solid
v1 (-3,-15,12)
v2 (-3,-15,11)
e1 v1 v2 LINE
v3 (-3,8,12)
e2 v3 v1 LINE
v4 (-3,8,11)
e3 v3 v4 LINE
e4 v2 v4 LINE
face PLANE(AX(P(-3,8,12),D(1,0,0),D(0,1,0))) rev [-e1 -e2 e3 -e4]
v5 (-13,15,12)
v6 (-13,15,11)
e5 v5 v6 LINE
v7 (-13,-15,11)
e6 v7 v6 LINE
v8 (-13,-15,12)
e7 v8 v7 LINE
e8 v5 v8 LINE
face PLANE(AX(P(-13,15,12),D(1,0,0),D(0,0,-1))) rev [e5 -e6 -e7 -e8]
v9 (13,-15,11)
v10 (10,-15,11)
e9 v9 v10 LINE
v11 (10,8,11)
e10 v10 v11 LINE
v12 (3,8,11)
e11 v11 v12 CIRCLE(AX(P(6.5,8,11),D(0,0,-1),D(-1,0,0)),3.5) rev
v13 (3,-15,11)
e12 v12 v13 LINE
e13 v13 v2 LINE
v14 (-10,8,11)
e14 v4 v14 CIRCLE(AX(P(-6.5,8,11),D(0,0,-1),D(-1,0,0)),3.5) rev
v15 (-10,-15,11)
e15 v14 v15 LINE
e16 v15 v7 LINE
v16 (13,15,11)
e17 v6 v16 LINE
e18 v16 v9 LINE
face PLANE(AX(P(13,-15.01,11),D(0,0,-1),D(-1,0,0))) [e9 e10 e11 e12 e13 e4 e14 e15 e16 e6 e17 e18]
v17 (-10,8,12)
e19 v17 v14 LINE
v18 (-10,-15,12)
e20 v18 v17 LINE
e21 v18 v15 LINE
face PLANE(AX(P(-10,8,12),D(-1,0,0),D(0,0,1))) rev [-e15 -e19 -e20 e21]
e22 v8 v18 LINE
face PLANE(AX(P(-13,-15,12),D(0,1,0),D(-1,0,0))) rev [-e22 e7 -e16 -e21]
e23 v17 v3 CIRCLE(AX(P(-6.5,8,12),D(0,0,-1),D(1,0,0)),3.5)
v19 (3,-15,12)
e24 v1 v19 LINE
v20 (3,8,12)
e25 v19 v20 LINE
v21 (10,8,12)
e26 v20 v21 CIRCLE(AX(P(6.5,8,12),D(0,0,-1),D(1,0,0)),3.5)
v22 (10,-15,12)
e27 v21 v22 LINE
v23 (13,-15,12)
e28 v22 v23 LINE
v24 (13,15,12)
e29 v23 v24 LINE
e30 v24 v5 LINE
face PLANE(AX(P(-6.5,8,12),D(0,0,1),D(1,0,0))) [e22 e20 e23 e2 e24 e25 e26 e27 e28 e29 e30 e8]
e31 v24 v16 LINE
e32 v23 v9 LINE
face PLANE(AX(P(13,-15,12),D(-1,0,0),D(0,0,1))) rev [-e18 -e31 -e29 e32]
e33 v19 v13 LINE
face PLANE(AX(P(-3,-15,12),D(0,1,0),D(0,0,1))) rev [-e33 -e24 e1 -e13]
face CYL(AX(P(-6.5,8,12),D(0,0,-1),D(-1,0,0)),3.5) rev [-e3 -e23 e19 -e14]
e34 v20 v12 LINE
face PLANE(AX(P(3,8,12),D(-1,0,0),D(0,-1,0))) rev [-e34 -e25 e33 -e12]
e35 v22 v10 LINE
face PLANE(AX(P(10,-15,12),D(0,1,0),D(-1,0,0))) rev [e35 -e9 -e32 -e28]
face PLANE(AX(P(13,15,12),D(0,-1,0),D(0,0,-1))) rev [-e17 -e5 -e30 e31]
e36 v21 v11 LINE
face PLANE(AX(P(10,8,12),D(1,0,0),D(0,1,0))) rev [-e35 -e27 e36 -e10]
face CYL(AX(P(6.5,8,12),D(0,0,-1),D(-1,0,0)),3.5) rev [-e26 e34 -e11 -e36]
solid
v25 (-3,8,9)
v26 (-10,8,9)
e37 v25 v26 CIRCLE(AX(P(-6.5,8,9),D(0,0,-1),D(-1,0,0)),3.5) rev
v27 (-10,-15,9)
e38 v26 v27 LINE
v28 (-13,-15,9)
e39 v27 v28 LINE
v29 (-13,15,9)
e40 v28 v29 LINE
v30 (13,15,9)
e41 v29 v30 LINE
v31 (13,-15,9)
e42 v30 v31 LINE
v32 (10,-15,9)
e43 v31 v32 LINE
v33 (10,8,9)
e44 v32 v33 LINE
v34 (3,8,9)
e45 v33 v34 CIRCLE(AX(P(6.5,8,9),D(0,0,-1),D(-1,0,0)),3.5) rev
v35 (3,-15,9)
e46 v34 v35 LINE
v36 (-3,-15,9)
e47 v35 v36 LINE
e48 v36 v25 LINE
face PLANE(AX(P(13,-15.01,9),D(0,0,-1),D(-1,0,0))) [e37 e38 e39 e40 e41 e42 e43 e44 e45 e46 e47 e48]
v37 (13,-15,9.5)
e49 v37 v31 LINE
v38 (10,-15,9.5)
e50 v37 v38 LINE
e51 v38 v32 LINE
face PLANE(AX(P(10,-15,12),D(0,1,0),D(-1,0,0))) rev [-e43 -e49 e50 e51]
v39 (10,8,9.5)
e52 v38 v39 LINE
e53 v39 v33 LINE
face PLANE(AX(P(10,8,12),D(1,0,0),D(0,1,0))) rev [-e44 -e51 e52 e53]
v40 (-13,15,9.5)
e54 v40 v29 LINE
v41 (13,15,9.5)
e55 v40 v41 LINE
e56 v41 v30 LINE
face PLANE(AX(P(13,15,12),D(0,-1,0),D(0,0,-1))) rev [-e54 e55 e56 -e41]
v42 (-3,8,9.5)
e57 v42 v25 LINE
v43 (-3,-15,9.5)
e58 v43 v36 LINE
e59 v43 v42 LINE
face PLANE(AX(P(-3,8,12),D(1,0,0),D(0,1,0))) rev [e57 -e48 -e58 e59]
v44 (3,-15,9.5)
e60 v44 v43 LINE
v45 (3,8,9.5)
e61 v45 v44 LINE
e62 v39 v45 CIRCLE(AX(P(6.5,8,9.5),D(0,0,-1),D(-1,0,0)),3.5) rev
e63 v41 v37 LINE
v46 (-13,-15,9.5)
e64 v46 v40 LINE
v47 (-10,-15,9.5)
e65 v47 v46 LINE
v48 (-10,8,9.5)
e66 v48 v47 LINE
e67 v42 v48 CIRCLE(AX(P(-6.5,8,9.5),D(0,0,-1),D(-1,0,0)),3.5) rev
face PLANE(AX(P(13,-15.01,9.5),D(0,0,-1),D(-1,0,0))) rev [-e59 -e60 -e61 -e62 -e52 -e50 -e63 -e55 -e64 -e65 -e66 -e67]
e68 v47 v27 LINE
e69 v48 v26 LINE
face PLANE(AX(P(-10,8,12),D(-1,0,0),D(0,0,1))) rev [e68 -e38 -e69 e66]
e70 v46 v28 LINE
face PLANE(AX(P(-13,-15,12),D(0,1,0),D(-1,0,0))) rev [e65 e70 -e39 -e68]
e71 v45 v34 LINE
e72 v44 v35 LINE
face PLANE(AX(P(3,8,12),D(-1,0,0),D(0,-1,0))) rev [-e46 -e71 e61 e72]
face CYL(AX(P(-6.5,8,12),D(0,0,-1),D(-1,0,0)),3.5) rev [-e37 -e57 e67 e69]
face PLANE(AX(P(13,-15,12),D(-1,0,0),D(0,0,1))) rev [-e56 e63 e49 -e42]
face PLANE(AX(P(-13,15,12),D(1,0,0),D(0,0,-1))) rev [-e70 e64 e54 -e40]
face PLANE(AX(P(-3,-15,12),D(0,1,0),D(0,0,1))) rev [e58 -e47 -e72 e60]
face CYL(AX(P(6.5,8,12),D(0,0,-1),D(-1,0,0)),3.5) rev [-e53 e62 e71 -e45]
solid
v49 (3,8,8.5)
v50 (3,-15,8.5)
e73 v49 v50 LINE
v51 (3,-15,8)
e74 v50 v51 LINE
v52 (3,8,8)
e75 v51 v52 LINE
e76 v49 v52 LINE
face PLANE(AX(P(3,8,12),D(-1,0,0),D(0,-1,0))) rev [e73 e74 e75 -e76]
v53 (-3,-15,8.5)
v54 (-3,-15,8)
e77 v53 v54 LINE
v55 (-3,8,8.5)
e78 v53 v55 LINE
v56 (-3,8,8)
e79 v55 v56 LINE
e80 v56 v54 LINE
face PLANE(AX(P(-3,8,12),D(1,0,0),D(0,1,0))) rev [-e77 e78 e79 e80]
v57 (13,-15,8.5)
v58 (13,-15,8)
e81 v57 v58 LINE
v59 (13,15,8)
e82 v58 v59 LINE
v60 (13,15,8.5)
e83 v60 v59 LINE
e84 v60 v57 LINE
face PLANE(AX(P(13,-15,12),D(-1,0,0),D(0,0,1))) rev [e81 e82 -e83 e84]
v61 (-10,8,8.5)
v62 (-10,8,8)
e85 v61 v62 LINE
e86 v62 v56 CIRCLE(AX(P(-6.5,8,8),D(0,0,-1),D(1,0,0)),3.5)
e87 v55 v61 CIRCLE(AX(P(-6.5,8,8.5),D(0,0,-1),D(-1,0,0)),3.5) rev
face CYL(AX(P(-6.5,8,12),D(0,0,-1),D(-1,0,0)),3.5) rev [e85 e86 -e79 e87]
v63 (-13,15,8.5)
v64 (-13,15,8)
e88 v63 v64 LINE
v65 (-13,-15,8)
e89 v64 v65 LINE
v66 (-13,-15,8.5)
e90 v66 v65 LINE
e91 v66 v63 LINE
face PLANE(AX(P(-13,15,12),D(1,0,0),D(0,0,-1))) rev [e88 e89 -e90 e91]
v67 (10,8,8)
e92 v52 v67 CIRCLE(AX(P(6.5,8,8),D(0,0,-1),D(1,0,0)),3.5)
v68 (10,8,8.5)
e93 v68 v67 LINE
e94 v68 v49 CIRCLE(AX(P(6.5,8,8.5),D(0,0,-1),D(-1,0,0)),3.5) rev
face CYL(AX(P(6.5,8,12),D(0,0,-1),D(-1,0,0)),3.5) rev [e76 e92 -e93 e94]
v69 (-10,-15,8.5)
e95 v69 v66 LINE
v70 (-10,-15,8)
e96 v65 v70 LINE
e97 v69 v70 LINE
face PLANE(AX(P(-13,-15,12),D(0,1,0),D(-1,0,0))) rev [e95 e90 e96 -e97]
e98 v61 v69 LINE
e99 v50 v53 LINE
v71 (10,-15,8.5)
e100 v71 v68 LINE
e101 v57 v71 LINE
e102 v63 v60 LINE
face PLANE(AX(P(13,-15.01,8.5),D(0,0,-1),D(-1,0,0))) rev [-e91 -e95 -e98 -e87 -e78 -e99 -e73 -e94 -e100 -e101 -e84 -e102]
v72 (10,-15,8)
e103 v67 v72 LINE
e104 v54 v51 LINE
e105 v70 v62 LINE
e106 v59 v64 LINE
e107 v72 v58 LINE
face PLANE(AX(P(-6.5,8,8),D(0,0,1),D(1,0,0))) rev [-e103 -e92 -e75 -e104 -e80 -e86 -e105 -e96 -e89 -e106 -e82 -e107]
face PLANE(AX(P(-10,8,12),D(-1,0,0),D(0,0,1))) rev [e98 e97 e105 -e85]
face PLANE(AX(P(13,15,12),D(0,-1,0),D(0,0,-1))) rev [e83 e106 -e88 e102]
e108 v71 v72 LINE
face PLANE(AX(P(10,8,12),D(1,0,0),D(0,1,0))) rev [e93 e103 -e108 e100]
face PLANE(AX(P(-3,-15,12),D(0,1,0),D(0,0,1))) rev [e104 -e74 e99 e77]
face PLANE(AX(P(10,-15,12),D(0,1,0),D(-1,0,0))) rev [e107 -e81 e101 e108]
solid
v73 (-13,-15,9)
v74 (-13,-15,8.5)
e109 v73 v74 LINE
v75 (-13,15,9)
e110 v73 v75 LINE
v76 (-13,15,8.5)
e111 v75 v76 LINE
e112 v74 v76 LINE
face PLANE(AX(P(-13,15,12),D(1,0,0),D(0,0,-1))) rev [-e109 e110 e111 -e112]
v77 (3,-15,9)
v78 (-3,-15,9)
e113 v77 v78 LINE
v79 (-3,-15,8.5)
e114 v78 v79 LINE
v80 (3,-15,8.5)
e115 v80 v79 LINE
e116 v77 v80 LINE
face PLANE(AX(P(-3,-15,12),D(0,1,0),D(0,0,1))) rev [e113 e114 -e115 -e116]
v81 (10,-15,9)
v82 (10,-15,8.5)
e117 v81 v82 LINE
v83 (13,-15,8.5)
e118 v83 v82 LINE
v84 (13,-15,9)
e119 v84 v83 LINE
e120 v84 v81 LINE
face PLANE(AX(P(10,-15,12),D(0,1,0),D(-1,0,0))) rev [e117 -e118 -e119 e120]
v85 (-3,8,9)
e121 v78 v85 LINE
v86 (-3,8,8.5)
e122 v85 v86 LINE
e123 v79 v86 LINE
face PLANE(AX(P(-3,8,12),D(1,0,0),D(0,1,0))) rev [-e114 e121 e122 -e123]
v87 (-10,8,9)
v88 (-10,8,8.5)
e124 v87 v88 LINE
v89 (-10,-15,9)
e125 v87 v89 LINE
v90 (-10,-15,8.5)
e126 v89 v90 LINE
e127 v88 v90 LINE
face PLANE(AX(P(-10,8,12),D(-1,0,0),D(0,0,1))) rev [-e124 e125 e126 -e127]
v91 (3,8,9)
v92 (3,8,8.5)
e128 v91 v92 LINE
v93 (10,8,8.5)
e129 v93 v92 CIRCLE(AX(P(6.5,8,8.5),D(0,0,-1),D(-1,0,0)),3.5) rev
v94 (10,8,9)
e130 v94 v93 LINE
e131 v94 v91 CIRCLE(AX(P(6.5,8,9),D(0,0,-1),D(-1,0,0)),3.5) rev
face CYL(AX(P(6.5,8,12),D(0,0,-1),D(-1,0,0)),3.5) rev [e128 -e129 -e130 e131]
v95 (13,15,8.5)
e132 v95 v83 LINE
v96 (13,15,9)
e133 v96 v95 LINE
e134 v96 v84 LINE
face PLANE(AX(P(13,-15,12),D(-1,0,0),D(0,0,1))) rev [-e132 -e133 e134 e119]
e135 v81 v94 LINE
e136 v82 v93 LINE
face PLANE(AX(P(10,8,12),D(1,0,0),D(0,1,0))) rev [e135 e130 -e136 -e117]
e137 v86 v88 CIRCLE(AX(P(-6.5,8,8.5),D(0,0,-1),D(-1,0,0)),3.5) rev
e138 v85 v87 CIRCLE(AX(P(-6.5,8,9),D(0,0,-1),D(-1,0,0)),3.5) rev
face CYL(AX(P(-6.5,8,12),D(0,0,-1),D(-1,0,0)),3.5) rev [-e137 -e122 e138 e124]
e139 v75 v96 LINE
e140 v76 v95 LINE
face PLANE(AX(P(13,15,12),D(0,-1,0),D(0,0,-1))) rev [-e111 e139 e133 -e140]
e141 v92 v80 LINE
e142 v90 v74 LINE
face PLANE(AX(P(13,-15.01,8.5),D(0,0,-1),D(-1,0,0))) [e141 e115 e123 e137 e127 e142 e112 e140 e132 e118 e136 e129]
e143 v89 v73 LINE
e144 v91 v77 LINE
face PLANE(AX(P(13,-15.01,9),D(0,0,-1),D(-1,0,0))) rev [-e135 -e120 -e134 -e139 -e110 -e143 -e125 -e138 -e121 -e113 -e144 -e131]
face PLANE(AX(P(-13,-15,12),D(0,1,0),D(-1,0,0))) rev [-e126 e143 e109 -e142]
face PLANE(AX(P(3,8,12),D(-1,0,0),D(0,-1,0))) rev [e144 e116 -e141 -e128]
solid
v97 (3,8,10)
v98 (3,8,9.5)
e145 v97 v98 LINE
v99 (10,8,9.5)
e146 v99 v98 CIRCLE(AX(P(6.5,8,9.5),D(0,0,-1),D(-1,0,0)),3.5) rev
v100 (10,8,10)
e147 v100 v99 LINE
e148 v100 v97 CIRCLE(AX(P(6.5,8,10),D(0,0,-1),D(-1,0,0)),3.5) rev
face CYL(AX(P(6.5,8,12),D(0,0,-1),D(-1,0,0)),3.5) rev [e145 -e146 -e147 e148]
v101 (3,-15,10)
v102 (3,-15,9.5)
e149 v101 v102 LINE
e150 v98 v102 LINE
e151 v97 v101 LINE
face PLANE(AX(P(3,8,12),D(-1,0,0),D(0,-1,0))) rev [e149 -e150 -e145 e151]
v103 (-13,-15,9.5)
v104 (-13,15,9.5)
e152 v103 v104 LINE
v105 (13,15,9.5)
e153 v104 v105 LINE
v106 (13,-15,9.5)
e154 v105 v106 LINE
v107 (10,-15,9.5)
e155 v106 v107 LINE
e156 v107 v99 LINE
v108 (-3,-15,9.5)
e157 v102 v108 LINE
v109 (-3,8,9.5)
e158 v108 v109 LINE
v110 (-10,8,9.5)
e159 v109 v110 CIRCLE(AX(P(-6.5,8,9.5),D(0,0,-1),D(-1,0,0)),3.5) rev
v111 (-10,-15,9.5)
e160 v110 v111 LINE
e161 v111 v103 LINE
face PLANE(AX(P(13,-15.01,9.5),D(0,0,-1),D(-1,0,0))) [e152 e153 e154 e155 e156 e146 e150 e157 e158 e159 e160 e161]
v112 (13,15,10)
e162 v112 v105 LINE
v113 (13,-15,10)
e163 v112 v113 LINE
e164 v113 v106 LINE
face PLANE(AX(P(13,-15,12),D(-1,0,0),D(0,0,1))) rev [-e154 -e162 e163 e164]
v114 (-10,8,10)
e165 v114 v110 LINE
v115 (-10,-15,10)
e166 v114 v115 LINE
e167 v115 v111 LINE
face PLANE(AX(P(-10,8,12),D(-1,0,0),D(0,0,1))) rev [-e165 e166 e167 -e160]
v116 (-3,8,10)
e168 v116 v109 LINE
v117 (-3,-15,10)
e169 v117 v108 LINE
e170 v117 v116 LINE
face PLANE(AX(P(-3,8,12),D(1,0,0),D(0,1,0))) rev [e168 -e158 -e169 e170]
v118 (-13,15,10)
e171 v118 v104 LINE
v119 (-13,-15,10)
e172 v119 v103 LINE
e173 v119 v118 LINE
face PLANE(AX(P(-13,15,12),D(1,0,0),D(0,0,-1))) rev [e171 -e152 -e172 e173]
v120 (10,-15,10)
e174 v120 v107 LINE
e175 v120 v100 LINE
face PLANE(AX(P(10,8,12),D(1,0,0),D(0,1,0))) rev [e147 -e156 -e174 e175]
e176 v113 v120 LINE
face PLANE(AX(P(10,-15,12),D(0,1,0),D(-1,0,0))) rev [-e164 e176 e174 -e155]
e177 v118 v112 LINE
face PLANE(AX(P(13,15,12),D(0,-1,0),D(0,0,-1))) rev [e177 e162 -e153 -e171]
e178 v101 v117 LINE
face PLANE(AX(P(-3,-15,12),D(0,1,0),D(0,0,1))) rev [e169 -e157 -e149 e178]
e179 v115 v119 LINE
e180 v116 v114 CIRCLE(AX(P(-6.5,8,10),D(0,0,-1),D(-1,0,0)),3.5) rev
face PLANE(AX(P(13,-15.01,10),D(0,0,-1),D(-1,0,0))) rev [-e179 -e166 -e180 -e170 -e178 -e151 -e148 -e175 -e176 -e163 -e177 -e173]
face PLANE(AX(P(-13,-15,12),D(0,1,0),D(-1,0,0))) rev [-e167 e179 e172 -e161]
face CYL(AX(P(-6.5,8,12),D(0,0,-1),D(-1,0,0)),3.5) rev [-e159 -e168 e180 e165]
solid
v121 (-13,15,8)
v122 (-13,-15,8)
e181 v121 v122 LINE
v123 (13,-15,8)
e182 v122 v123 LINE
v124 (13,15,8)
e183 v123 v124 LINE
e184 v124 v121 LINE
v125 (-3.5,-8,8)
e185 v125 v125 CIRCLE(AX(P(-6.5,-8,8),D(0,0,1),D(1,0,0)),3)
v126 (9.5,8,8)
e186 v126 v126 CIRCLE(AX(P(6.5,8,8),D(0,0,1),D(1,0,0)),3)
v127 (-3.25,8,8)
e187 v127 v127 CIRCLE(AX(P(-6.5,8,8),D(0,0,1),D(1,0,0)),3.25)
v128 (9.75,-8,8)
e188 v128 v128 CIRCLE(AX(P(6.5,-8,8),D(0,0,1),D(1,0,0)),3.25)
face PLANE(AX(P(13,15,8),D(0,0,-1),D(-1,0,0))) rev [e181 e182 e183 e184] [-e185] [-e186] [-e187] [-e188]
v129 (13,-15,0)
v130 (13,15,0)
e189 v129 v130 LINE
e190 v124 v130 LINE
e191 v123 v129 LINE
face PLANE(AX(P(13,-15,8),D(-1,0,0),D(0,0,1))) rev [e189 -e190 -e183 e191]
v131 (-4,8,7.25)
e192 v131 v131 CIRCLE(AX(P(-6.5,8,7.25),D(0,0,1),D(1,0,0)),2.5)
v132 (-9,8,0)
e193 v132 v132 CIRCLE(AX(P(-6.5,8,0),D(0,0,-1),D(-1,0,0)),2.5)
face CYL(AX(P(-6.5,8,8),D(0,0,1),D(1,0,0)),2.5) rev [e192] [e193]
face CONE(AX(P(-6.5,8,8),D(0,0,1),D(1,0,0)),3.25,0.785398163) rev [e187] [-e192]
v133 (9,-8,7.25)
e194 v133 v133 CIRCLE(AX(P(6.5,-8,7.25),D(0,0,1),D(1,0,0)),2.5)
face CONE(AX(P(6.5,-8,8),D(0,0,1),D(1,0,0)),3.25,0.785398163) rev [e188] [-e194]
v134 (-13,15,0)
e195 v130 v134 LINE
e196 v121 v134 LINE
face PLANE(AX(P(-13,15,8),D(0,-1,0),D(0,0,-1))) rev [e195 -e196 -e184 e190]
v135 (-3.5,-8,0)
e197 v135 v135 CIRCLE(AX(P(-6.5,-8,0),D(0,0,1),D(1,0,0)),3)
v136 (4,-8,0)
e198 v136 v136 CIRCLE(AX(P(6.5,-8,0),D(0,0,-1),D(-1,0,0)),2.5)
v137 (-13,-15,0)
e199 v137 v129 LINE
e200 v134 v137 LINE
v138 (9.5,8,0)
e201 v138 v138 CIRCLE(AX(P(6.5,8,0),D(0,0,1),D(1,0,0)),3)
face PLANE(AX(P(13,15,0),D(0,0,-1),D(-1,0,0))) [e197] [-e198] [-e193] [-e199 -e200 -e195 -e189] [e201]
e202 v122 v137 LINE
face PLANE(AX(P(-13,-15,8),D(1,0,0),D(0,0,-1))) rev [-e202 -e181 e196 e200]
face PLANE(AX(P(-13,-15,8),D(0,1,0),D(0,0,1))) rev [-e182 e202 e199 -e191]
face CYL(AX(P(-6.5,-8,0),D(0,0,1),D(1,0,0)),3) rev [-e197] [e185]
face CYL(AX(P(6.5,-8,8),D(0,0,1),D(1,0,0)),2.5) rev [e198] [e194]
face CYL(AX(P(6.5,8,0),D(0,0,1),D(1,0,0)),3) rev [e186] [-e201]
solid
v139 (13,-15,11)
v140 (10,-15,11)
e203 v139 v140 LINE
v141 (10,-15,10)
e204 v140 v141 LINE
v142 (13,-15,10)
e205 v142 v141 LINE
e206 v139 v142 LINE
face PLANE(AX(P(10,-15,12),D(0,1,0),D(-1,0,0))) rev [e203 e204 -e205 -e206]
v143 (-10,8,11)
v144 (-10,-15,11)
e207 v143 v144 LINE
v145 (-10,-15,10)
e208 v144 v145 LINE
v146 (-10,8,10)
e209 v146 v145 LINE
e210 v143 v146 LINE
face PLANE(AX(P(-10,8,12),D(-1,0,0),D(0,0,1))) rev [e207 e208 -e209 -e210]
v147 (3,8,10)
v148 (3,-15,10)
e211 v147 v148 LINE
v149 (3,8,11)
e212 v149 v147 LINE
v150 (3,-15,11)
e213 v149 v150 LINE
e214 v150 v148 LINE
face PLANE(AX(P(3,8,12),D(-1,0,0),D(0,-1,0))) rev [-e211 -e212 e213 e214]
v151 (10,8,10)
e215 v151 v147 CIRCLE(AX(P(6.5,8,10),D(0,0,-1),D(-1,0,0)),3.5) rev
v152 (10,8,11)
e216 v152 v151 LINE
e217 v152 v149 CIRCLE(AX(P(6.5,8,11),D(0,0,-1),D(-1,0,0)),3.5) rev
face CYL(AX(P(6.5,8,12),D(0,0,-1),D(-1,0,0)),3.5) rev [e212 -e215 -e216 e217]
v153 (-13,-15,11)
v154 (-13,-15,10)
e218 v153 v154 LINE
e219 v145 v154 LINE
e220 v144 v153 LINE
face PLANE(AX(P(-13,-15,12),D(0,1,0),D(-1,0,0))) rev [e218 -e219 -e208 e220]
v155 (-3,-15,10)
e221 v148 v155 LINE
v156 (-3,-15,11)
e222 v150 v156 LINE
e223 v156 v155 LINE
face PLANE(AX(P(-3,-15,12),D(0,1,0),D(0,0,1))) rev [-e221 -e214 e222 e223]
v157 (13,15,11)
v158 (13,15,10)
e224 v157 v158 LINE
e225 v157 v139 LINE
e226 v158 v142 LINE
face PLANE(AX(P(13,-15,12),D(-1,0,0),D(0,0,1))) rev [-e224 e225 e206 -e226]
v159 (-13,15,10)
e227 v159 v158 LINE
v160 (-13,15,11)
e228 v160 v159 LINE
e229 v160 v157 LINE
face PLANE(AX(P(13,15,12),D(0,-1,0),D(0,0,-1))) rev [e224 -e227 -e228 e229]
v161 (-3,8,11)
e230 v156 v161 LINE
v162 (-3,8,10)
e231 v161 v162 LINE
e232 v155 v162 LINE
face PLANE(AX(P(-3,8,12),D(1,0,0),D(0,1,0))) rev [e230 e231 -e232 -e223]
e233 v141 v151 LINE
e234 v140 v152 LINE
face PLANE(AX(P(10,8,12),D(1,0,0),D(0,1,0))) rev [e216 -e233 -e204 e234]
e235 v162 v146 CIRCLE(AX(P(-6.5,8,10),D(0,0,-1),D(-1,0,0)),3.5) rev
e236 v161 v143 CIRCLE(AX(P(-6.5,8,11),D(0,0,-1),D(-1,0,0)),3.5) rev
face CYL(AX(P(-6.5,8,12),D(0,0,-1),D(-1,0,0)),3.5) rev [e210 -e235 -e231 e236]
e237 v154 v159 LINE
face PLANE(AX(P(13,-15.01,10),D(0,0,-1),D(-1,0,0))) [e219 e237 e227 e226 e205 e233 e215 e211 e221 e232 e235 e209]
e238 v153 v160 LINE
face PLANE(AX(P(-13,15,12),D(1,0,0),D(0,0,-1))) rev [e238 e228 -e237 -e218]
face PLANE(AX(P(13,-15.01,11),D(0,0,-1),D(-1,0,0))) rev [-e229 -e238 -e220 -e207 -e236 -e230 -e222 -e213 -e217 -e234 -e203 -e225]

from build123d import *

# Parameters (mm, degrees)
SKETCH_1_W             = 26
SKETCH_1_H             = 30
EXTRUDE_654_DEPTH      = 8
SKETCH_2_R             = 3
CUT_EXTRUDE_976_DEPTH  = 22.400934559
M6X1_01_D              = 5
M6X1_01_CSINK_D        = 6.5
M6X1_01_CSINK_ANGLE    = 90
EXTRUDE_3_DEPTH        = 4
SPLIT_START            = 8
SPLIT_BODIES_1_DEPTH   = 3
SPLIT_START_2          = 10
SPLIT_BODIES_1_2_DEPTH = 1
SPLIT_START_3          = 9.5
SPLIT_BODIES_1_3_DEPTH = 0.5
SPLIT_START_4          = 9
SPLIT_BODIES_1_4_DEPTH = 0.5
SPLIT_START_5          = 8.5
SPLIT_BODIES_1_5_DEPTH = 0.5
SPLIT_BODIES_1_6_DEPTH = 0.5


# Read off the part's stored shape, not the designer's step: Разделить1
with BuildPart() as part:
    # Эскиз1 → Extrude 654 (new body)
    with BuildSketch(Plane.XY):
        Rectangle(SKETCH_1_W, SKETCH_1_H)
    extrude(amount=EXTRUDE_654_DEPTH)

    # Эскиз2 → Cut-Extrude 976 (cut, through all)
    with BuildSketch(Plane.XY.offset(8)):
        with Locations((-6.5, -8)):
            Circle(SKETCH_2_R)
        with Locations((6.5, 8)):
            Circle(SKETCH_2_R)
    extrude(amount=-CUT_EXTRUDE_976_DEPTH, mode=Mode.SUBTRACT)

    # Отверстие обработанное метчиком M6x1.01 (through all)
    with Locations(Plane(origin=(-6.5, 8, 8), x_dir=(1, 0, 0), z_dir=(0, 0, 1))):
        with Locations((0, 0), (13, -16)):
            CounterSinkHole(M6X1_01_D / 2, M6X1_01_CSINK_D / 2, counter_sink_angle=M6X1_01_CSINK_ANGLE)


with BuildPart() as body_2:
    # Эскиз4 → Вытянуть3 (new body)
    with BuildSketch(Plane.XY.offset(8)):
        with BuildLine():
            Line((-10, 8), (-10, -15))
            Line((-10, -15), (-13, -15))
            Line((-13, -15), (-13, 15))
            Line((-13, 15), (13, 15))
            Line((13, 15), (13, -15))
            Line((13, -15), (10, -15))
            Line((10, -15), (10, 8))
            ThreePointArc((10, 8), (6.5, 11.5), (3, 8))
            Line((3, 8), (3, -15))
            Line((3, -15), (-3, -15))
            Line((-3, -15), (-3, 8))
            ThreePointArc((-3, 8), (-6.5, 11.5), (-10, 8))
        make_face()
    extrude(amount=EXTRUDE_3_DEPTH)

    # Split Bodies 1 outline → Split Bodies 1 (cut)
    with BuildSketch(Plane.XY.offset(SPLIT_START)):
        with BuildLine():
            Line((10, -15), (13, -15))
            Line((13, -15), (13, 15))
            Line((13, 15), (-13, 15))
            Line((-13, 15), (-13, -15))
            Line((-13, -15), (-10, -15))
            Line((-10, -15), (-10, 8))
            ThreePointArc((-10, 8), (-6.5, 11.5), (-3, 8))
            Line((-3, 8), (-3, -15))
            Line((-3, -15), (3, -15))
            Line((3, -15), (3, 8))
            ThreePointArc((3, 8), (6.5, 11.5), (10, 8))
            Line((10, 8), (10, -15))
        make_face()
    extrude(amount=SPLIT_BODIES_1_DEPTH, mode=Mode.SUBTRACT)


with BuildPart() as body_3:
    # Split Bodies 1 2 outline → Split Bodies 1 2 (new body)
    with BuildSketch(Plane.XY.offset(SPLIT_START_2)):
        with BuildLine():
            Line((13, -15), (13, 15))
            Line((13, 15), (-13, 15))
            Line((-13, 15), (-13, -15))
            Line((-13, -15), (-10, -15))
            Line((-10, -15), (-10, 8))
            ThreePointArc((-10, 8), (-6.5, 11.5), (-3, 8))
            Line((-3, 8), (-3, -15))
            Line((-3, -15), (3, -15))
            Line((3, -15), (3, 8))
            ThreePointArc((3, 8), (6.5, 11.5), (10, 8))
            Line((10, 8), (10, -15))
            Line((10, -15), (13, -15))
        make_face()
    extrude(amount=SPLIT_BODIES_1_2_DEPTH)


with BuildPart() as body_4:
    # Split Bodies 1 3 outline → Split Bodies 1 3 (new body)
    with BuildSketch(Plane.XY.offset(SPLIT_START_3)):
        with BuildLine():
            Line((13, -15), (13, 15))
            Line((13, 15), (-13, 15))
            Line((-13, 15), (-13, -15))
            Line((-13, -15), (-10, -15))
            Line((-10, -15), (-10, 8))
            ThreePointArc((-10, 8), (-6.5, 11.5), (-3, 8))
            Line((-3, 8), (-3, -15))
            Line((-3, -15), (3, -15))
            Line((3, -15), (3, 8))
            ThreePointArc((3, 8), (6.5, 11.5), (10, 8))
            Line((10, 8), (10, -15))
            Line((10, -15), (13, -15))
        make_face()
    extrude(amount=SPLIT_BODIES_1_3_DEPTH)


with BuildPart() as body_5:
    # Split Bodies 1 4 outline → Split Bodies 1 4 (new body)
    with BuildSketch(Plane.XY.offset(SPLIT_START_4)):
        with BuildLine():
            Line((13, -15), (13, 15))
            Line((13, 15), (-13, 15))
            Line((-13, 15), (-13, -15))
            Line((-13, -15), (-10, -15))
            Line((-10, -15), (-10, 8))
            ThreePointArc((-10, 8), (-6.5, 11.5), (-3, 8))
            Line((-3, 8), (-3, -15))
            Line((-3, -15), (3, -15))
            Line((3, -15), (3, 8))
            ThreePointArc((3, 8), (6.5, 11.5), (10, 8))
            Line((10, 8), (10, -15))
            Line((10, -15), (13, -15))
        make_face()
    extrude(amount=SPLIT_BODIES_1_4_DEPTH)


with BuildPart() as body_6:
    # Split Bodies 1 5 outline → Split Bodies 1 5 (new body)
    with BuildSketch(Plane.XY.offset(SPLIT_START_5)):
        with BuildLine():
            Line((13, -15), (13, 15))
            Line((13, 15), (-13, 15))
            Line((-13, 15), (-13, -15))
            Line((-13, -15), (-10, -15))
            Line((-10, -15), (-10, 8))
            ThreePointArc((-10, 8), (-6.5, 11.5), (-3, 8))
            Line((-3, 8), (-3, -15))
            Line((-3, -15), (3, -15))
            Line((3, -15), (3, 8))
            ThreePointArc((3, 8), (6.5, 11.5), (10, 8))
            Line((10, 8), (10, -15))
            Line((10, -15), (13, -15))
        make_face()
    extrude(amount=SPLIT_BODIES_1_5_DEPTH)


with BuildPart() as body_7:
    # Split Bodies 1 6 outline → Split Bodies 1 6 (new body)
    with BuildSketch(Plane.XY.offset(SPLIT_START)):
        with BuildLine():
            Line((13, -15), (13, 15))
            Line((13, 15), (-13, 15))
            Line((-13, 15), (-13, -15))
            Line((-13, -15), (-10, -15))
            Line((-10, -15), (-10, 8))
            ThreePointArc((-10, 8), (-6.5, 11.5), (-3, 8))
            Line((-3, 8), (-3, -15))
            Line((-3, -15), (3, -15))
            Line((3, -15), (3, 8))
            ThreePointArc((3, 8), (6.5, 11.5), (10, 8))
            Line((10, 8), (10, -15))
            Line((10, -15), (13, -15))
        make_face()
    extrude(amount=SPLIT_BODIES_1_6_DEPTH)


solid = Compound([part.part, body_2.part, body_3.part, body_4.part, body_5.part, body_6.part, body_7.part])
